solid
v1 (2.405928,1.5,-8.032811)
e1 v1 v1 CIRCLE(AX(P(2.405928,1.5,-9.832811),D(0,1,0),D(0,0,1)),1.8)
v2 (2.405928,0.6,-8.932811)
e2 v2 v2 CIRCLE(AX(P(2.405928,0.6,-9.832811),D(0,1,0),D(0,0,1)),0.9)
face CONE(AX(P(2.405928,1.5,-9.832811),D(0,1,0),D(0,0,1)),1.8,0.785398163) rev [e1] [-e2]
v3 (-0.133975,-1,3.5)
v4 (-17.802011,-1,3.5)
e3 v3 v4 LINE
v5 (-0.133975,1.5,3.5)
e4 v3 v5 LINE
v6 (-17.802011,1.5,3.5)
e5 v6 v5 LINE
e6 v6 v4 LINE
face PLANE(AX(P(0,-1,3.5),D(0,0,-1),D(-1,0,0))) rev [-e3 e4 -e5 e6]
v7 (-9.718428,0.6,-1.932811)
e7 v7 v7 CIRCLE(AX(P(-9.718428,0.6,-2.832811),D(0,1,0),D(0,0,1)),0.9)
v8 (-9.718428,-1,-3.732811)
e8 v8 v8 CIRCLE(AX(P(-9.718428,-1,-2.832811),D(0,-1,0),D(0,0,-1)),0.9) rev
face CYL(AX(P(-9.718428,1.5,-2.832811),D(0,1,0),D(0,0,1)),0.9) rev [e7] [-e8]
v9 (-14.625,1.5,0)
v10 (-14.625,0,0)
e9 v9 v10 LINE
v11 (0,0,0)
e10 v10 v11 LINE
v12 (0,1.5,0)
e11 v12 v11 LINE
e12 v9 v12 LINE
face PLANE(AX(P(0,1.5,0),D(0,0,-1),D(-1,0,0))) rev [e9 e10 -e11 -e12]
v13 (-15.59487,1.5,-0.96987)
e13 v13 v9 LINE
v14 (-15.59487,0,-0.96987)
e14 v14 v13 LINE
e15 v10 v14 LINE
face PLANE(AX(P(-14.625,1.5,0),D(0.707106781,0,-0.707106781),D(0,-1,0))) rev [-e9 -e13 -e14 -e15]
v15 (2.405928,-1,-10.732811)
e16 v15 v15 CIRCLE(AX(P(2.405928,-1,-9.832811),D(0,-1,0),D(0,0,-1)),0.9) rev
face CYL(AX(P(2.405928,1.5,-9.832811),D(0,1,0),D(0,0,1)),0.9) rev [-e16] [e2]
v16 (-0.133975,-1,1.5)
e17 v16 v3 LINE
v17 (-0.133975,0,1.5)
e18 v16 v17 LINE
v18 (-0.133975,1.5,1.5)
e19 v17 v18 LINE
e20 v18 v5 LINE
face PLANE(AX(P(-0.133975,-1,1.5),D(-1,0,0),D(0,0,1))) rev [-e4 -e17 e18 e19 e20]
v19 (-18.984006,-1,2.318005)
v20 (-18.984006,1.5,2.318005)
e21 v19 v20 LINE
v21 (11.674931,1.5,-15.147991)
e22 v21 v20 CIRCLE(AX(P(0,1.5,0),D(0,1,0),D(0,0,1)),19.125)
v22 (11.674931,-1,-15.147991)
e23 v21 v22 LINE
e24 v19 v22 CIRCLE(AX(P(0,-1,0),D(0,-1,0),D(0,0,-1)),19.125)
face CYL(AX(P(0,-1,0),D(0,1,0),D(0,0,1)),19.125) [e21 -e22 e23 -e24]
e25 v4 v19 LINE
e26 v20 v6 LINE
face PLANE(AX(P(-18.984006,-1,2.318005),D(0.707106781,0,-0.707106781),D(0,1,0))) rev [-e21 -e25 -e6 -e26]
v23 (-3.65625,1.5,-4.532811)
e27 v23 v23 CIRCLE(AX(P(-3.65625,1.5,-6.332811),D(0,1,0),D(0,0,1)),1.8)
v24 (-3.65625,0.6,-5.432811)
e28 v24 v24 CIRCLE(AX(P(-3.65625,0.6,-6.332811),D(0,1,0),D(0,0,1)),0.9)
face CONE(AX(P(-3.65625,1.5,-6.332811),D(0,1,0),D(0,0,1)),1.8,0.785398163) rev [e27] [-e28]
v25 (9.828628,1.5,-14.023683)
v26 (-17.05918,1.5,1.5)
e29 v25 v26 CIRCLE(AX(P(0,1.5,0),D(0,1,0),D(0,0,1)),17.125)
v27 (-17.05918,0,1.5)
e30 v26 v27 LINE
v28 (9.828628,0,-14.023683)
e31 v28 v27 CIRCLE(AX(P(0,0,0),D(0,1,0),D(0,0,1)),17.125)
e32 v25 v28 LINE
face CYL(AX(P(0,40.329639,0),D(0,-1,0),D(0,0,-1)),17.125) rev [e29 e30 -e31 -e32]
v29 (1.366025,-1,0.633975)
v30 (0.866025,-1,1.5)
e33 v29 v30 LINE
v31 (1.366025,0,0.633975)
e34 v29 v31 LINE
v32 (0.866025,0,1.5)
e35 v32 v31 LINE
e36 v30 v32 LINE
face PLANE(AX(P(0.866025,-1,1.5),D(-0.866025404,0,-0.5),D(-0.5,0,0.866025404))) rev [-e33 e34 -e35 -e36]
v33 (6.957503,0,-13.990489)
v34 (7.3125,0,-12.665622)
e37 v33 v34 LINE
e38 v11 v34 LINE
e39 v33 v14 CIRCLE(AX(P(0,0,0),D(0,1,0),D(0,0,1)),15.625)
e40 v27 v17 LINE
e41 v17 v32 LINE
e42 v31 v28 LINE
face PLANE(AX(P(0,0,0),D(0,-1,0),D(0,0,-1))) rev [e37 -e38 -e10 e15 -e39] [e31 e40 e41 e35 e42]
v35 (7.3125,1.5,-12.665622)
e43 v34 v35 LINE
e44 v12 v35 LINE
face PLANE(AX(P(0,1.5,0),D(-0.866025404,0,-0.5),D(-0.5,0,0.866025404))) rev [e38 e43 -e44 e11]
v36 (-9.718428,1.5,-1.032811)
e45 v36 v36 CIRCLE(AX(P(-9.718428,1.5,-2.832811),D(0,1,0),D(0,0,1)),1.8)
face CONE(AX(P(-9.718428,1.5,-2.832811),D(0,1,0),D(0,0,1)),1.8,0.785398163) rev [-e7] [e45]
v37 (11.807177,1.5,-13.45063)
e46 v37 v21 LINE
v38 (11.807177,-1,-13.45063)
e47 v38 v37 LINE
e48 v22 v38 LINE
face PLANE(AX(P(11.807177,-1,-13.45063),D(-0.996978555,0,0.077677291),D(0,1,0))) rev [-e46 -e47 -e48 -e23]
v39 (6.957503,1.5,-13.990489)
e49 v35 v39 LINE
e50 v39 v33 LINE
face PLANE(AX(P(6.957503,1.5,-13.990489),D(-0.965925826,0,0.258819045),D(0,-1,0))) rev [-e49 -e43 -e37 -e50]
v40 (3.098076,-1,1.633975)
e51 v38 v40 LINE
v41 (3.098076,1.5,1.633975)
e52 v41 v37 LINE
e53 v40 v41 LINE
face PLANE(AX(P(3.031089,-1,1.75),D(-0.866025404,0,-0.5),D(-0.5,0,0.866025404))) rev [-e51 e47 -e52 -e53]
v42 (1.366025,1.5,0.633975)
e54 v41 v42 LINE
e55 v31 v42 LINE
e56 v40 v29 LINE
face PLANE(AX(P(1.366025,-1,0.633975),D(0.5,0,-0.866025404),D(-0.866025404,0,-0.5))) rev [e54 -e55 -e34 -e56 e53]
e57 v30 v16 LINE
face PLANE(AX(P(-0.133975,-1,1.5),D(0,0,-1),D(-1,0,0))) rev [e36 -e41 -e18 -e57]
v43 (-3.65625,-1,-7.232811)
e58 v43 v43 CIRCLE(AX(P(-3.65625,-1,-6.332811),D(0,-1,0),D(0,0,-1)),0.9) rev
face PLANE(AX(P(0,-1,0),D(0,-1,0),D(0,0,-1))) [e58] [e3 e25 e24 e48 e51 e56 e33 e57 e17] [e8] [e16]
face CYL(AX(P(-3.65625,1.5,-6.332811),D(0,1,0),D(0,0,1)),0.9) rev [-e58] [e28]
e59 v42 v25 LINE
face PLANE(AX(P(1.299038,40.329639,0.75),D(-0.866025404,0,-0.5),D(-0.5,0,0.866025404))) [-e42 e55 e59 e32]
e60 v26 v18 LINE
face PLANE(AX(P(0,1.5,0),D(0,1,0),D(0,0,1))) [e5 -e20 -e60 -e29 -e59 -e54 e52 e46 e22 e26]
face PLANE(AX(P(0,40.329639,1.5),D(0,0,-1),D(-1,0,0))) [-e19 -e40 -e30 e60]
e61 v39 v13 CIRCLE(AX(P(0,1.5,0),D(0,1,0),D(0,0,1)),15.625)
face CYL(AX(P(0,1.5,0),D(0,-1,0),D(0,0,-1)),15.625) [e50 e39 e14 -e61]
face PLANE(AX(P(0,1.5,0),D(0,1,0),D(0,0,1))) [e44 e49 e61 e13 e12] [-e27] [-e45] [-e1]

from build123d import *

# Parameters (mm, degrees)
BOSS_EXTRUDE8_DEPTH                                  = 1.5
BOSS_EXTRUDE9_START                                  = -1.5
BOSS_EXTRUDE9_DEPTH                                  = 1.5
BOSS_EXTRUDE10_DEPTH                                 = 1
CHAMFER2_SIZE                                        = 1
CUT_EXTRUDE6_DEPTH                                   = 28.162128967
CHAMFER5_SIZE                                        = 1.249835708
CHAMFER5_SIZE_2                                      = 1
CSK_FOR_M1_6_COUNTERSUNK_FLAT_HEAD_SCREW_D           = 1.8
CSK_FOR_M1_6_COUNTERSUNK_FLAT_HEAD_SCREW_DEPTH       = 2.5
CSK_FOR_M1_6_COUNTERSUNK_FLAT_HEAD_SCREW_CSINK_D     = 3.6
CSK_FOR_M1_6_COUNTERSUNK_FLAT_HEAD_SCREW_CSINK_ANGLE = 90
CSK_FOR_M1_6_COUNTERSUNK_FLAT_HEAD_SCREW_TIP         = 0.540774557


with BuildPart() as part:
    # Sketch15 → Boss-Extrude8 (new body)
    with BuildSketch(Plane(origin=(0, 0, 0), x_dir=(1, 0, 0), z_dir=(0, 1, 0))):
        with BuildLine():
            Line((0, 0), (-15.625, 0))
            ThreePointArc((-15.625, 0), (-7.8125, 13.531646934), (7.8125, 13.531646934))
            Line((7.8125, 13.531646934), (0, 0))
        make_face()
    extrude(amount=BOSS_EXTRUDE8_DEPTH)



with BuildPart() as body_2:
    # Sketch16 → Boss-Extrude9 (new body)
    with BuildSketch(Plane(origin=(0, 1.5, 0), x_dir=(1, 0, 0), z_dir=(0, 1, 0)).offset(BOSS_EXTRUDE9_START)):
        with BuildLine():
            Line((2.020725942, -3.5), (12.432094511, 14.533019338))
            ThreePointArc((12.432094511, 14.533019338), (-9.5625, 16.562735847), (-18.802011196, -3.5))
            Line((-18.802011196, -3.5), (2.020725942, -3.5))
        make_face()
        with BuildLine():
            Line((0.866025404, -1.5), (9.828628146, 14.023683317))
            ThreePointArc((9.828628146, 14.023683317), (-8.5625, 14.83068504), (-17.05918008, -1.5))
            Line((-17.05918008, -1.5), (0.866025404, -1.5))
        make_face(mode=Mode.SUBTRACT)
    extrude(amount=BOSS_EXTRUDE9_DEPTH)


with BuildPart() as part_1:
    add(part.part)

    add(body_2.part)  # Boss-Extrude10 merges body 2
    # Sketch17 → Boss-Extrude10 (add)
    with BuildSketch(Plane.XZ):
        with BuildLine():
            Line((12.432094511, -14.533019338), (2.020725942, 3.5))
            Line((2.020725942, 3.5), (-18.802011196, 3.5))
            ThreePointArc((-18.802011196, 3.5), (-9.5625, -16.562735847), (12.432094511, -14.533019338))
        make_face()
    extrude(amount=BOSS_EXTRUDE10_DEPTH)

    # Chamfer2
    # the kernel refuses this chamfer: 1 mm, written as the material it takes off along each edge
    with BuildSketch(Plane(origin=(-15.625, 0, 0), x_dir=(1, 0, 0), z_dir=(0, 1, 0))) as chamfer2_piece_1:
        with BuildLine():
            Line((CHAMFER2_SIZE, 0), (0.030129793, 0.969870207))
            ThreePointArc((0.030129793, 0.969870207), (0.007965345, 0.498852279), (0, 0))
            Line((0, 0), (CHAMFER2_SIZE, 0))
        make_face()
    extrude(amount=4.071682988, mode=Mode.SUBTRACT)
    with BuildSketch(Plane(origin=(7.8125, 0, -13.531646934), x_dir=(-0.8811332220086912, 0, -0.4728681053661608), z_dir=(0, 1, 0))) as chamfer2_piece_2:
        with BuildLine():
            Line((0.970338097, 0), (CHAMFER2_SIZE * 0.0310508191178, CHAMFER2_SIZE * 0.999517807061))
            Line((CHAMFER2_SIZE * 0.0310508191178, CHAMFER2_SIZE * 0.999517807061), (0, 0))
            ThreePointArc((0, 0), (0.498859067, -0.007528267), (0.970338097, 0))
        make_face()
    extrude(amount=4.071682988, mode=Mode.SUBTRACT)

    # Sketch19 → Cut-Extrude6 (cut, through all)
    with BuildSketch(Plane(origin=(0, 1.5, 0), x_dir=(1, 0, 0), z_dir=(0, 1, 0))):
        Polygon((-0.133974596, -1.5), (-0.133974596, -3.5), (2.020725942, -3.5), (3.098076211, -1.633974596), (1.366025404, -0.633974596), (0.866025404, -1.5), align=None)
    extrude(amount=-CUT_EXTRUDE6_DEPTH, mode=Mode.SUBTRACT)

    # Chamfer5
    # the kernel refuses this chamfer: 1.249835708, 1 mm, written as the material it takes off along each edge
    with BuildSketch(Plane(origin=(12.432094511, -4.228421452, -14.533019338), x_dir=(-0.500000000000006, 0, 0.8660254037844353), z_dir=(0, 1, 0))) as chamfer5_piece_1:
        with BuildLine():
            Line((CHAMFER5_SIZE, 0), (-0.153998799, -0.963208706))
            ThreePointArc((-0.153998799, -0.963208706), (-0.08585038, -0.497615929), (0, 0))
            Line((0, 0), (CHAMFER5_SIZE, 0))
        make_face()
    extrude(amount=8.956842905, mode=Mode.SUBTRACT)
    with BuildSketch(Plane(origin=(-18.802011196, -4.09148885, 3.5), x_dir=(-0.1521791167983569, 0, -0.9883529310982349), z_dir=(0, 1, 0))) as chamfer5_piece_2:
        with BuildLine():
            Line((1.195923602, 0), (-CHAMFER5_SIZE_2 * 0.152179116798, -CHAMFER5_SIZE_2 * 0.988352931098))
            Line((-CHAMFER5_SIZE_2 * 0.152179116798, -CHAMFER5_SIZE_2 * 0.988352931098), (0, 0))
            ThreePointArc((0, 0), (0.618115367, 0.009339597), (1.195923602, 0))
        make_face()
    extrude(amount=8.6829777, mode=Mode.SUBTRACT)

    # CSK for M1.6 Countersunk Flat Head Screw1
    with Locations(Plane(origin=(0, 1.5, 0), x_dir=(1, 0, 0), z_dir=(0, 1, 0))):
        with Locations((-3.65625, 6.332810765), (-9.718427826, 2.832810765), (2.405927826, 9.832810765)):
            CounterSinkHole(CSK_FOR_M1_6_COUNTERSUNK_FLAT_HEAD_SCREW_D / 2, CSK_FOR_M1_6_COUNTERSUNK_FLAT_HEAD_SCREW_CSINK_D / 2, depth=CSK_FOR_M1_6_COUNTERSUNK_FLAT_HEAD_SCREW_DEPTH, counter_sink_angle=CSK_FOR_M1_6_COUNTERSUNK_FLAT_HEAD_SCREW_CSINK_ANGLE)
            with Locations((0, 0, -(CSK_FOR_M1_6_COUNTERSUNK_FLAT_HEAD_SCREW_DEPTH + CSK_FOR_M1_6_COUNTERSUNK_FLAT_HEAD_SCREW_TIP / 2))):  # 118° drill point
                Cone(0, CSK_FOR_M1_6_COUNTERSUNK_FLAT_HEAD_SCREW_D / 2, CSK_FOR_M1_6_COUNTERSUNK_FLAT_HEAD_SCREW_TIP, mode=Mode.SUBTRACT)


solid = part_1.part
